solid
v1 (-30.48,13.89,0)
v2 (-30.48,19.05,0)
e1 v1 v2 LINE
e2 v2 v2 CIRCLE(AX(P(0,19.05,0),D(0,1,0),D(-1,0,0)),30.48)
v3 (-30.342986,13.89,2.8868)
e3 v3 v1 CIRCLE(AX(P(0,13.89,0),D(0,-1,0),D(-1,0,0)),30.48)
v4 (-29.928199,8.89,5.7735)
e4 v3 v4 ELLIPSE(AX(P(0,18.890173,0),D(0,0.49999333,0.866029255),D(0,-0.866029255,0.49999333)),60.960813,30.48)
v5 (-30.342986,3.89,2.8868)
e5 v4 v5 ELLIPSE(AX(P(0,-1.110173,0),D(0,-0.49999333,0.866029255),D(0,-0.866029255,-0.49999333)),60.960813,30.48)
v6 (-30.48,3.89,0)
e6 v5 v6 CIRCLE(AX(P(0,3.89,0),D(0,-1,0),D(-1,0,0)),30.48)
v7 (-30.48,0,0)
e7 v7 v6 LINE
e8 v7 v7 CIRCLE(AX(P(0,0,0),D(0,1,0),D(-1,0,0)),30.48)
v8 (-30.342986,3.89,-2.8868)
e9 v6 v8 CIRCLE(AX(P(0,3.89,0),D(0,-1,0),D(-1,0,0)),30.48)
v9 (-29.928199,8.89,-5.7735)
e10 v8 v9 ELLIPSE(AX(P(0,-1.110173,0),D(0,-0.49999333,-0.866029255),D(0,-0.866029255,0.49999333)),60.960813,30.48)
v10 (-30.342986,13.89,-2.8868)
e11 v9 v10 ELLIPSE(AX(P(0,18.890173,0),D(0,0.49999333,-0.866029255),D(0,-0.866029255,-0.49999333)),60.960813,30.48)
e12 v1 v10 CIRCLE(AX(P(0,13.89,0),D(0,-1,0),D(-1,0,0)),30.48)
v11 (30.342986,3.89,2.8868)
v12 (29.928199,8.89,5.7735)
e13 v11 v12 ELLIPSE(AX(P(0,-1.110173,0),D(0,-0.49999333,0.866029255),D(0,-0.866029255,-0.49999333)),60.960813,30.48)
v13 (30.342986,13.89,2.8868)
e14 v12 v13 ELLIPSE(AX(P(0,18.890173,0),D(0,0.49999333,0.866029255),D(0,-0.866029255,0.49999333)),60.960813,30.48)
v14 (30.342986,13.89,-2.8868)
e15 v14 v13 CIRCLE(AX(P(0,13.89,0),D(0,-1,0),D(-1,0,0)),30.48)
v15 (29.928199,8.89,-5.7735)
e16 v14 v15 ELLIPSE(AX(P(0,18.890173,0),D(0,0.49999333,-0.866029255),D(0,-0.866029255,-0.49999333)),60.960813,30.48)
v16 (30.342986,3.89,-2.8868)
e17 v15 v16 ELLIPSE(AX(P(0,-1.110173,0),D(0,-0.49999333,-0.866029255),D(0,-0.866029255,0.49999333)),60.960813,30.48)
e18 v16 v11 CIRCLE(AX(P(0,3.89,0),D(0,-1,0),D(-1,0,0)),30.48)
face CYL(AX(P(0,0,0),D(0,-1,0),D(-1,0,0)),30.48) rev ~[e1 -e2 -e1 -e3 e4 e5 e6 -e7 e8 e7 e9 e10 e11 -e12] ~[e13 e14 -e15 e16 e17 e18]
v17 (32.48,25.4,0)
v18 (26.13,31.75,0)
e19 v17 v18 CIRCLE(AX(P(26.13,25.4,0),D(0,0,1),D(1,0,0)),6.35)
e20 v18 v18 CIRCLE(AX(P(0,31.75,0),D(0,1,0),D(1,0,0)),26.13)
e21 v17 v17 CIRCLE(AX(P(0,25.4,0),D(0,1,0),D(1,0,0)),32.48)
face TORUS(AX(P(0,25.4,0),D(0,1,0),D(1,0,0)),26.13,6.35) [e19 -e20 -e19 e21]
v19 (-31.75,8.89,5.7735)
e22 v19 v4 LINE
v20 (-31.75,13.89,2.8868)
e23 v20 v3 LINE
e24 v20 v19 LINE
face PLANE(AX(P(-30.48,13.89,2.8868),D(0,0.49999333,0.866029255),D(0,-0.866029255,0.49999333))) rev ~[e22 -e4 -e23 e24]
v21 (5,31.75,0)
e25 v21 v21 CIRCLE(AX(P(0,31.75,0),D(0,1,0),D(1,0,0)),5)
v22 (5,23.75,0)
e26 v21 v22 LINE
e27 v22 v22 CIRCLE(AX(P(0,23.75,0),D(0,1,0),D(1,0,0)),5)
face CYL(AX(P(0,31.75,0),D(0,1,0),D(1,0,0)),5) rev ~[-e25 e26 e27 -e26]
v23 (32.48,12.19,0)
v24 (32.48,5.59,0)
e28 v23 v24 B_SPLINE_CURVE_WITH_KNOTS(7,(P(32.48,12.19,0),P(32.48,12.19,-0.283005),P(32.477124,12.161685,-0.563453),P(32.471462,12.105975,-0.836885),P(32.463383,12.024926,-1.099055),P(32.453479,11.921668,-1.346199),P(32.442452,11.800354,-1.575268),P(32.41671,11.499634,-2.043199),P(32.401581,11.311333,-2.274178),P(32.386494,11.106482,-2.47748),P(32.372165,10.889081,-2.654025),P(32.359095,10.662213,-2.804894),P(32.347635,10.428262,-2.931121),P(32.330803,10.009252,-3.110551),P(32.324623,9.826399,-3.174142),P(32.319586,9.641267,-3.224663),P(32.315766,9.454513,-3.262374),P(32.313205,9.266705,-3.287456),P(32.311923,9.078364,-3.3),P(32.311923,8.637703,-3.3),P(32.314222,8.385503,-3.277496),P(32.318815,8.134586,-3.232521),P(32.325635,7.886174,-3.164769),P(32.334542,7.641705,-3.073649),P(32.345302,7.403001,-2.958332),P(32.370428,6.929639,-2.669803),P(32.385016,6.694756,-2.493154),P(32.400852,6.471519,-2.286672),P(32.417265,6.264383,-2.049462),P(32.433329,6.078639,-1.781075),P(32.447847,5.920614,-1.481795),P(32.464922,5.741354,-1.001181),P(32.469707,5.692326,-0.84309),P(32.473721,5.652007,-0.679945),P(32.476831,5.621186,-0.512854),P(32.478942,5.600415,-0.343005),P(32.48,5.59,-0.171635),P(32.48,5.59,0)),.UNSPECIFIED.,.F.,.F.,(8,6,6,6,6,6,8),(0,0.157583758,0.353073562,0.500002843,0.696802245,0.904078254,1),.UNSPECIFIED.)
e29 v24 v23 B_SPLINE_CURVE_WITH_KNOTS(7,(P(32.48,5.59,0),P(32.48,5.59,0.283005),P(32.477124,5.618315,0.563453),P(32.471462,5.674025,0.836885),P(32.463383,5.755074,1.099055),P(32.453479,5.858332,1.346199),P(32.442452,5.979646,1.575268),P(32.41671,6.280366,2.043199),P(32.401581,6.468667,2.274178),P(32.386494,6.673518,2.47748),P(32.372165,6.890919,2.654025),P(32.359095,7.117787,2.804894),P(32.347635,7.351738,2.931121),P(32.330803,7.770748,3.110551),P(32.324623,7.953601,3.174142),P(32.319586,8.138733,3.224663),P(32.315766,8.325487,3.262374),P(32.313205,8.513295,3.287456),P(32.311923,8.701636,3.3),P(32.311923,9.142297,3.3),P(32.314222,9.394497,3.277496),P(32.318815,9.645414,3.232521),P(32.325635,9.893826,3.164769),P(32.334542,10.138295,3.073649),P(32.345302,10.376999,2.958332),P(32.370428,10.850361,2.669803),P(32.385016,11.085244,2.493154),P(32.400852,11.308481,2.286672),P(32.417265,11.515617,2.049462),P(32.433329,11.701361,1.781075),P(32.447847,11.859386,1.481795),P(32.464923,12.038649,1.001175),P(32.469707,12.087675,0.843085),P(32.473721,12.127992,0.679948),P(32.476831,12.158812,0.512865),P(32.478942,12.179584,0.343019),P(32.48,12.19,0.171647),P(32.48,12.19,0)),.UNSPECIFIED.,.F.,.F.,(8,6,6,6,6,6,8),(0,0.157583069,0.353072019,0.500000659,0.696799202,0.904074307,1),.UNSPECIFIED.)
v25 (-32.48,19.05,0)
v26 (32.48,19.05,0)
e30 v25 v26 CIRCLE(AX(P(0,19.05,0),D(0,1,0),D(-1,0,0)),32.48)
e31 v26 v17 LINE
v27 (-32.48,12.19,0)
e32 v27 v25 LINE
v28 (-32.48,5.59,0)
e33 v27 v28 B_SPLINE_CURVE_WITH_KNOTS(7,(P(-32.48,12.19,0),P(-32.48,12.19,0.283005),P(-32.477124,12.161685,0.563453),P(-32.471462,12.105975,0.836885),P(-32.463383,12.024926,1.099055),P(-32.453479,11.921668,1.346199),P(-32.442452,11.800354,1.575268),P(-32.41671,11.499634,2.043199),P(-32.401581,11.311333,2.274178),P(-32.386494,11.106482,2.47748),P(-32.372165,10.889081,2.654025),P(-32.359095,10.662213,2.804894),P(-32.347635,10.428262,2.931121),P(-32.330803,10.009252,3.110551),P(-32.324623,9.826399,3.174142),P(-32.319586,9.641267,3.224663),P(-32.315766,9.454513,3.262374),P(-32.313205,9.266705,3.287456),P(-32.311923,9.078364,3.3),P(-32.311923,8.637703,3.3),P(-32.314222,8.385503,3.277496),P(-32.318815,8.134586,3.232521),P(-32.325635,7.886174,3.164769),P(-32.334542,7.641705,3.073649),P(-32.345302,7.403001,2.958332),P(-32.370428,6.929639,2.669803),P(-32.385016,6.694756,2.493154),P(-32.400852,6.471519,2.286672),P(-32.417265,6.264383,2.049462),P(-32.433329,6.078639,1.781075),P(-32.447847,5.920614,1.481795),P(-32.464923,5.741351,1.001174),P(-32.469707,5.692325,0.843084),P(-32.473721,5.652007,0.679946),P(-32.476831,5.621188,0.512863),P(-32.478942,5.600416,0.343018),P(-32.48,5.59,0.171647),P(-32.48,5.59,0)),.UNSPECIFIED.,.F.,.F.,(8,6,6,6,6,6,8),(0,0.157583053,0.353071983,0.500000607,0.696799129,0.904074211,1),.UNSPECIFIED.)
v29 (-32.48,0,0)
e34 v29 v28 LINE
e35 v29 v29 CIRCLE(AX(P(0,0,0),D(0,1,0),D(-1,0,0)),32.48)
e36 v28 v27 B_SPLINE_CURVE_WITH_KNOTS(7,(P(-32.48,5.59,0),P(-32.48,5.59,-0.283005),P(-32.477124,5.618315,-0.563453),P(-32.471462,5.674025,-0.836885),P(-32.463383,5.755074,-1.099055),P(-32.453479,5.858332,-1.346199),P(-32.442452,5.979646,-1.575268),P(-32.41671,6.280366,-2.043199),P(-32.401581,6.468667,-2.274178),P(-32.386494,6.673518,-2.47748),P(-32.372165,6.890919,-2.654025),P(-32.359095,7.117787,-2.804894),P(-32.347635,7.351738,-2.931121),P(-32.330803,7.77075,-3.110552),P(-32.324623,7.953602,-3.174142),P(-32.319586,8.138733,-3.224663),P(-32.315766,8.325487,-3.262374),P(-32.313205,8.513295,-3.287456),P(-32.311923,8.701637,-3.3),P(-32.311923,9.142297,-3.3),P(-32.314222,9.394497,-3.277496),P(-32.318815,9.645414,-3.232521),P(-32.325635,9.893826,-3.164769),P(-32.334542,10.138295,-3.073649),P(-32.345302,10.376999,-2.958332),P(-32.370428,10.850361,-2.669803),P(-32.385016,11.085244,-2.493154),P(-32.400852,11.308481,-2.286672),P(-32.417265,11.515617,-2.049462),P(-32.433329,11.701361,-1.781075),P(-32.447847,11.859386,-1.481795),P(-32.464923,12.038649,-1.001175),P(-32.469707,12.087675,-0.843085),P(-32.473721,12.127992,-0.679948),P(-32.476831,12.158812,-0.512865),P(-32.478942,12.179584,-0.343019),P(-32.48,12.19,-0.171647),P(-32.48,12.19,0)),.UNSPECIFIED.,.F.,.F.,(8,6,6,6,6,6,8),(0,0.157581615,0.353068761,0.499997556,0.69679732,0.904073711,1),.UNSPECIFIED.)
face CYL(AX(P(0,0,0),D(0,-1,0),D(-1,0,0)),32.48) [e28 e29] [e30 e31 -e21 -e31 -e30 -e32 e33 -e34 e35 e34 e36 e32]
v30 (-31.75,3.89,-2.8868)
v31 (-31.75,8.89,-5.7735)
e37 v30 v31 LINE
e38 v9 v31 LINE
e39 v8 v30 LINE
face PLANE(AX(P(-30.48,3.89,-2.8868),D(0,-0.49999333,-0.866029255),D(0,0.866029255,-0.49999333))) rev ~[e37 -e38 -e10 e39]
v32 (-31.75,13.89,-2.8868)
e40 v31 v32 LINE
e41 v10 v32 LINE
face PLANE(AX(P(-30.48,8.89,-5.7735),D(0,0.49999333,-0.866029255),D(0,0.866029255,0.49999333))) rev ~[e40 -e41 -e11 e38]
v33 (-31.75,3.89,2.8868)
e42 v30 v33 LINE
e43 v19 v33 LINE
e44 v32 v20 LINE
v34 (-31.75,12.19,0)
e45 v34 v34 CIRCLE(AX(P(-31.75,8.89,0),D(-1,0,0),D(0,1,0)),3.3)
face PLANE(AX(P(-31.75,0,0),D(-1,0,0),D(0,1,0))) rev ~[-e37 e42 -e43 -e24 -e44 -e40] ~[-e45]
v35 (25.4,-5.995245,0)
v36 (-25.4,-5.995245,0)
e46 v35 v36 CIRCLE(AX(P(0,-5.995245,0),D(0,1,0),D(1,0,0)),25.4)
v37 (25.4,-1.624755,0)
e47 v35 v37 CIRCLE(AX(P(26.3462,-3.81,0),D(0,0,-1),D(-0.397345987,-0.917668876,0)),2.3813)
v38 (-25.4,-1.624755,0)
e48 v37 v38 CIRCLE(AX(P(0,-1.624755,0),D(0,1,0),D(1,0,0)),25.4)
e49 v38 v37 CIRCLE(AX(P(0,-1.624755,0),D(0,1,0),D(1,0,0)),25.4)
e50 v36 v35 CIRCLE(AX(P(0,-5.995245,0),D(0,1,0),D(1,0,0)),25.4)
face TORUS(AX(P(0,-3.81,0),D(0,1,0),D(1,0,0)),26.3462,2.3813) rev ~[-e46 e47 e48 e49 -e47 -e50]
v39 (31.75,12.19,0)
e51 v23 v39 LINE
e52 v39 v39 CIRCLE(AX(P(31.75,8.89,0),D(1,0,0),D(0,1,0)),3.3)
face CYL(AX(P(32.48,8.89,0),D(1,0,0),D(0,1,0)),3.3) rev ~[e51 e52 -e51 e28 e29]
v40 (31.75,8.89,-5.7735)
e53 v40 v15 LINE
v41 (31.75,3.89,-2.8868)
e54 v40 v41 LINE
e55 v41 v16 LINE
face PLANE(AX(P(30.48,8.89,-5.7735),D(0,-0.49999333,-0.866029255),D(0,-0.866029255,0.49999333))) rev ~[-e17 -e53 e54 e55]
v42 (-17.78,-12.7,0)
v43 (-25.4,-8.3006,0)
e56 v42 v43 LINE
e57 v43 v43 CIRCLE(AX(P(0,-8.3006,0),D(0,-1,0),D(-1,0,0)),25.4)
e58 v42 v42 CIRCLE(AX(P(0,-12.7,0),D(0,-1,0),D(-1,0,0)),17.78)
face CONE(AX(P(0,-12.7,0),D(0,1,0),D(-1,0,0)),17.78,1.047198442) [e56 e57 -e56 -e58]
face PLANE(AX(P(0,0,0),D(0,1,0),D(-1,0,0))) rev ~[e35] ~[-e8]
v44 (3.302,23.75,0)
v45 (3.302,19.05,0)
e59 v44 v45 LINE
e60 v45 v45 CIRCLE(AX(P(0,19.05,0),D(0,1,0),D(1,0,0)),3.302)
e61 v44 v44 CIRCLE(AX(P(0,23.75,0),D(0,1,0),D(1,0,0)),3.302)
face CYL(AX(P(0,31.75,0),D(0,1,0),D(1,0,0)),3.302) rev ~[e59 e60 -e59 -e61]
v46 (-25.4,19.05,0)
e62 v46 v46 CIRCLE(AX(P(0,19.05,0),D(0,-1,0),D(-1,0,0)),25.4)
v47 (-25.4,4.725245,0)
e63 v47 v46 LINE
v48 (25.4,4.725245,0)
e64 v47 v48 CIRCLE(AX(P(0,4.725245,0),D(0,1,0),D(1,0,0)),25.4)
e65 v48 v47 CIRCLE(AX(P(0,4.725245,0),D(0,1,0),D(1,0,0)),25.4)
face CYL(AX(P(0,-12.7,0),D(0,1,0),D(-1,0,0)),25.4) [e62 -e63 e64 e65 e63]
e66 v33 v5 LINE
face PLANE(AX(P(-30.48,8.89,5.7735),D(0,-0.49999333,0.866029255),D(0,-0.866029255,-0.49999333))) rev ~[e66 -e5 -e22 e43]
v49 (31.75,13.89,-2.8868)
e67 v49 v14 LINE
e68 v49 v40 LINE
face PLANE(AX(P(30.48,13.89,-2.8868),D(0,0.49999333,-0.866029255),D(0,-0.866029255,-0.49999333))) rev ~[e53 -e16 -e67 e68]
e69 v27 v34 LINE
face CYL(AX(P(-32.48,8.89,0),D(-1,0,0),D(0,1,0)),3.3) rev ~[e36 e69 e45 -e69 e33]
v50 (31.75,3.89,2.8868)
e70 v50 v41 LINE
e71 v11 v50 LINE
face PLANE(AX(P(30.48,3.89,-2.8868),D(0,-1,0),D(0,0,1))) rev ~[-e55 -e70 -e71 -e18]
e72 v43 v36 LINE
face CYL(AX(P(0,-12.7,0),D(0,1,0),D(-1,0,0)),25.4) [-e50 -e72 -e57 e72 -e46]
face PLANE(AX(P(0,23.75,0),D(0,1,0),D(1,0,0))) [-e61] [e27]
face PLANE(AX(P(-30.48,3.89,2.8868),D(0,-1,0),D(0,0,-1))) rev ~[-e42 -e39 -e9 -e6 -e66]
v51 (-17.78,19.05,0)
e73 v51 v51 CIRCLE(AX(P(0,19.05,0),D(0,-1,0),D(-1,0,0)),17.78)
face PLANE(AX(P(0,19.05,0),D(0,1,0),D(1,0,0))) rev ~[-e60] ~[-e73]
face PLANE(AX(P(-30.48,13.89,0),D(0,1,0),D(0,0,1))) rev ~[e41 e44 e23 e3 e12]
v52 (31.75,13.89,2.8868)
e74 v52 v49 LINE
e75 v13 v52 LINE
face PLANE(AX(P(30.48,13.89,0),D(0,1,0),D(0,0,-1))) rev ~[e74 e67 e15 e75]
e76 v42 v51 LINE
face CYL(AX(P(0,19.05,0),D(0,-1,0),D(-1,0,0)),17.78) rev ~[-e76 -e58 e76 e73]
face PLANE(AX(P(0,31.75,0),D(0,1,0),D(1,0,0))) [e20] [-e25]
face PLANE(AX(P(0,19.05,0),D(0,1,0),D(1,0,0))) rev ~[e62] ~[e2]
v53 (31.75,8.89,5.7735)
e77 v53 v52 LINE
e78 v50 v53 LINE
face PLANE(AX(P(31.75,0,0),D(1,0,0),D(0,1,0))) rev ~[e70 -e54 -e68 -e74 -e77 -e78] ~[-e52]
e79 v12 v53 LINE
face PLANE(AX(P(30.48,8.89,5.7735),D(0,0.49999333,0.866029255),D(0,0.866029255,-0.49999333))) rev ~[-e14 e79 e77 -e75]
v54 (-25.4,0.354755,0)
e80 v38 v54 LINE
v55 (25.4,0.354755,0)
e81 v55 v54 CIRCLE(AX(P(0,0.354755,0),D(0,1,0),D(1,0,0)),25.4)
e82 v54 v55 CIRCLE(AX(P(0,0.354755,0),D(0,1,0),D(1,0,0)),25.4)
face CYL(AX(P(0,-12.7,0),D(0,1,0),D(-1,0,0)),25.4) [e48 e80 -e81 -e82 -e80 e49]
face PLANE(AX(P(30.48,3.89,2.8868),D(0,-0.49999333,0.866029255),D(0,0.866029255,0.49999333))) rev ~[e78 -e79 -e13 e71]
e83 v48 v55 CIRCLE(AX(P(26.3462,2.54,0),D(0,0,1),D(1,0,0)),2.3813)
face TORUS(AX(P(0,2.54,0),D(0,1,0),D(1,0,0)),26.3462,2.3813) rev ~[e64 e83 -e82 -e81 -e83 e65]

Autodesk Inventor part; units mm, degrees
ref_plane "XZ Plane" through (0, 0, 0) normal (0, 1, 0) x (-1, 0, 0)
sketch "Sketch1" plane through (0, 0, 0) normal (0, 1, 0) x (-1, 0, 0)
  circle A0 centre (0, 0) radius 30.48
  circle A1 centre (0, 0) radius 32.48
  dimension "d0" = 60.96
  dimension "d2" = 2
extrude "Extrusion1" add sketch "Sketch1" along normal blind 19.05
sketch "Sketch2" plane through (0, 19.05, 0) normal (0, 1, 0) x (1, 0, 0)
  circle A0 centre (0, 0) radius 32.48
  circle A1 centre (0, 0) radius 32.48 projected
extrude "Extrusion2" add sketch "Sketch2" along normal blind 12.7
fillet "Fillet1" radius 6.35 1 edges at (-32.48, 31.75, 0)
sketch "Sketch6" plane through (0, 31.75, 0) normal (0, 1, 0) x (1, 0, 0)
  circle A0 centre (0, 0) radius 3.302
  dimension "d15" = 6.604
extrude "Extrusion5" cut sketch "Sketch6" against normal up to surface (12.7 mm away)
sketch "Sketch10" plane through (0, 0, 0) normal (0, 0, 1) x (1, 0, 0)
  line L0 (-17.78, 19.05) -> (-17.78, -12.7)
  line L1 (-17.78, -12.7) -> (-25.4, -12.7)
  line L2 (-25.4, -12.7) -> (-25.4, 19.05)
  line L3 (-17.78, 19.05) -> (-25.4, 19.05)
  line L4 (-26.13, 31.75) -> (26.13, 31.75) projected
  line L5 (0, 31.75) -> (0, 0)
  line L6 (32.48, 0) -> (-32.48, 0) projected
  line L7 (-30.48, 0) -> (-30.48, 19.05)
  line L8 (-17.78, -12.7) -> (-25.4, -8.3006)
  line L9 (-30.48, 19.05) -> (30.48, 19.05) projected
  point P0 (-30.48, 0)
  point P1 (-25.4, 19.05)
  dimension "d29" = 7.62
  dimension "d33" = 30
  dimension "d42" = 25.4
  dimension "d89" = 31.75
revolve "Revolution2" add sketch "Sketch10" angle 360 about axis through (0, 31.75, 0) along (0, -1, 0) contours L0 L6 L2 L3 | L0 L8 L2 L6
sketch "Sketch11" plane through (0, 0, 0) normal (0, 0, 1) x (1, 0, 0)
  line L0 (25.4, -7.0306) -> (25.4, 25.4)
  circle A0 centre (26.3462, -3.81) radius 2.3813
  circle A1 centre (26.3462, 2.54) radius 2.3813
  line L1 (0, -11.43) -> (0, 31.75)
  line L2 (-26.13, 31.75) -> (26.13, 31.75) projected
  line L3 (26.3462, 2.54) -> (26.3462, -3.81)
  line L4 (30.48, 19.05) -> (30.48, 0) projected
  line L5 (30.48, 0) -> (29.972, 19.05)
  line L6 (29.972, 19.05) -> (29.972, 0) projected
  line L7 (-25.4, -5.08) -> (25.4, -5.08) projected
  line L8 (-17.78, -12.7) -> (17.78, -12.7) projected
  point P0 (0, 0)
  point P1 (25.4, -8.3006)
  point P2 (27.772, -0.6806)
  point P3 (17.78, -12.7)
  dimension "d36" = 6.35
  dimension "d37" = 4.7625
  dimension "d38" = 4.7625
  dimension "d43" = 26.3462
  dimension "d91" = 8.89
revolve "Revolution3" cut sketch "Sketch11" angle 360 about axis through (0, -11.43, 0) along (0, 1, 0) contours A0 L7 L0 | L0 A0 | L7 A0 L0 | A1 L0 | L0 A1
sketch "Sketch23" plane through (0, 31.75, 0) normal (0, 1, 0) x (1, 0, 0)
  circle A0 centre (0, 0) radius 5
  dimension "d103" = 10
extrude "Extrusion15" cut sketch "Sketch23" against normal blind 8
ref_plane "Work Plane4" through (-32.48, 0, 0) normal (1, 0, 0) x (0, 1, 0)
sketch "Sketch24" plane through (-32.48, 0, 0) normal (1, 0, 0) x (0, 1, 0)
  circle A0 centre (8.89, 0) radius 3.3
  line L0 (0, -32.48) -> (0, 32.48) projected
  line L1 (31.75, 5) -> (31.75, -5) projected
  line L2 (31.75, 0) -> (0, 0) construction
  line L3 (-1.6248, -25.4) -> (-1.6248, 25.4) projected
  dimension "d106" = 6.6
  dimension "d107" = 8.89
  dimension "d108" = 0
extrude "Extrusion16" cut sketch "Sketch24" along normal up to surface
pattern_circular "Circular Pattern4" count 2 over 360 about axis through (0, 31.75, 0) along (0, -1, 0) of "Extrusion16"
ref_plane "Work Plane5" through (30.48, 0, 0) normal (1, 0, 0) x (0, 1, 0)
sketch "Sketch25" plane through (30.48, 0, 0) normal (1, 0, 0) x (0, 1, 0)
  line L0 (31.75, 5) -> (31.75, -5) projected
  line L1 (31.75, 0) -> (-12.7, 0)
  line L2 (-12.7, 17.78) -> (-12.7, -17.78) projected
  line L3 (13.89, -2.8868) -> (8.89, -5.7735)
  line L4 (8.89, -5.7735) -> (3.89, -2.8868)
  line L5 (3.89, -2.8868) -> (3.89, 2.8868)
  line L6 (3.89, 2.8868) -> (8.89, 5.7735)
  line L7 (8.89, 5.7735) -> (13.89, 2.8868)
  line L8 (13.89, 2.8868) -> (13.89, -2.8868)
  line L9 (0, -32.48) -> (0, 32.48) projected
  circle A0 centre (8.89, 0) radius 1.45
  point P0 (0, 0)
  point P1 (13.89, 0)
  dimension "d115" = 8.89
  dimension "d116" = 2.9
  dimension "d117" = 10
extrude "Extrusion17" cut sketch "Sketch25" along normal blind 1.27 and the other way blind 0.635 contours L8 L3 L4 L5 L1 A0 | L1 A0 L5 L6 L7 L8
pattern_circular "Circular Pattern5" count 2 over 360 about axis through (0, 31.75, 0) along (0, -1, 0) of "Extrusion17"
properties part number "Water_Sensor_Cap_3DPrint"
